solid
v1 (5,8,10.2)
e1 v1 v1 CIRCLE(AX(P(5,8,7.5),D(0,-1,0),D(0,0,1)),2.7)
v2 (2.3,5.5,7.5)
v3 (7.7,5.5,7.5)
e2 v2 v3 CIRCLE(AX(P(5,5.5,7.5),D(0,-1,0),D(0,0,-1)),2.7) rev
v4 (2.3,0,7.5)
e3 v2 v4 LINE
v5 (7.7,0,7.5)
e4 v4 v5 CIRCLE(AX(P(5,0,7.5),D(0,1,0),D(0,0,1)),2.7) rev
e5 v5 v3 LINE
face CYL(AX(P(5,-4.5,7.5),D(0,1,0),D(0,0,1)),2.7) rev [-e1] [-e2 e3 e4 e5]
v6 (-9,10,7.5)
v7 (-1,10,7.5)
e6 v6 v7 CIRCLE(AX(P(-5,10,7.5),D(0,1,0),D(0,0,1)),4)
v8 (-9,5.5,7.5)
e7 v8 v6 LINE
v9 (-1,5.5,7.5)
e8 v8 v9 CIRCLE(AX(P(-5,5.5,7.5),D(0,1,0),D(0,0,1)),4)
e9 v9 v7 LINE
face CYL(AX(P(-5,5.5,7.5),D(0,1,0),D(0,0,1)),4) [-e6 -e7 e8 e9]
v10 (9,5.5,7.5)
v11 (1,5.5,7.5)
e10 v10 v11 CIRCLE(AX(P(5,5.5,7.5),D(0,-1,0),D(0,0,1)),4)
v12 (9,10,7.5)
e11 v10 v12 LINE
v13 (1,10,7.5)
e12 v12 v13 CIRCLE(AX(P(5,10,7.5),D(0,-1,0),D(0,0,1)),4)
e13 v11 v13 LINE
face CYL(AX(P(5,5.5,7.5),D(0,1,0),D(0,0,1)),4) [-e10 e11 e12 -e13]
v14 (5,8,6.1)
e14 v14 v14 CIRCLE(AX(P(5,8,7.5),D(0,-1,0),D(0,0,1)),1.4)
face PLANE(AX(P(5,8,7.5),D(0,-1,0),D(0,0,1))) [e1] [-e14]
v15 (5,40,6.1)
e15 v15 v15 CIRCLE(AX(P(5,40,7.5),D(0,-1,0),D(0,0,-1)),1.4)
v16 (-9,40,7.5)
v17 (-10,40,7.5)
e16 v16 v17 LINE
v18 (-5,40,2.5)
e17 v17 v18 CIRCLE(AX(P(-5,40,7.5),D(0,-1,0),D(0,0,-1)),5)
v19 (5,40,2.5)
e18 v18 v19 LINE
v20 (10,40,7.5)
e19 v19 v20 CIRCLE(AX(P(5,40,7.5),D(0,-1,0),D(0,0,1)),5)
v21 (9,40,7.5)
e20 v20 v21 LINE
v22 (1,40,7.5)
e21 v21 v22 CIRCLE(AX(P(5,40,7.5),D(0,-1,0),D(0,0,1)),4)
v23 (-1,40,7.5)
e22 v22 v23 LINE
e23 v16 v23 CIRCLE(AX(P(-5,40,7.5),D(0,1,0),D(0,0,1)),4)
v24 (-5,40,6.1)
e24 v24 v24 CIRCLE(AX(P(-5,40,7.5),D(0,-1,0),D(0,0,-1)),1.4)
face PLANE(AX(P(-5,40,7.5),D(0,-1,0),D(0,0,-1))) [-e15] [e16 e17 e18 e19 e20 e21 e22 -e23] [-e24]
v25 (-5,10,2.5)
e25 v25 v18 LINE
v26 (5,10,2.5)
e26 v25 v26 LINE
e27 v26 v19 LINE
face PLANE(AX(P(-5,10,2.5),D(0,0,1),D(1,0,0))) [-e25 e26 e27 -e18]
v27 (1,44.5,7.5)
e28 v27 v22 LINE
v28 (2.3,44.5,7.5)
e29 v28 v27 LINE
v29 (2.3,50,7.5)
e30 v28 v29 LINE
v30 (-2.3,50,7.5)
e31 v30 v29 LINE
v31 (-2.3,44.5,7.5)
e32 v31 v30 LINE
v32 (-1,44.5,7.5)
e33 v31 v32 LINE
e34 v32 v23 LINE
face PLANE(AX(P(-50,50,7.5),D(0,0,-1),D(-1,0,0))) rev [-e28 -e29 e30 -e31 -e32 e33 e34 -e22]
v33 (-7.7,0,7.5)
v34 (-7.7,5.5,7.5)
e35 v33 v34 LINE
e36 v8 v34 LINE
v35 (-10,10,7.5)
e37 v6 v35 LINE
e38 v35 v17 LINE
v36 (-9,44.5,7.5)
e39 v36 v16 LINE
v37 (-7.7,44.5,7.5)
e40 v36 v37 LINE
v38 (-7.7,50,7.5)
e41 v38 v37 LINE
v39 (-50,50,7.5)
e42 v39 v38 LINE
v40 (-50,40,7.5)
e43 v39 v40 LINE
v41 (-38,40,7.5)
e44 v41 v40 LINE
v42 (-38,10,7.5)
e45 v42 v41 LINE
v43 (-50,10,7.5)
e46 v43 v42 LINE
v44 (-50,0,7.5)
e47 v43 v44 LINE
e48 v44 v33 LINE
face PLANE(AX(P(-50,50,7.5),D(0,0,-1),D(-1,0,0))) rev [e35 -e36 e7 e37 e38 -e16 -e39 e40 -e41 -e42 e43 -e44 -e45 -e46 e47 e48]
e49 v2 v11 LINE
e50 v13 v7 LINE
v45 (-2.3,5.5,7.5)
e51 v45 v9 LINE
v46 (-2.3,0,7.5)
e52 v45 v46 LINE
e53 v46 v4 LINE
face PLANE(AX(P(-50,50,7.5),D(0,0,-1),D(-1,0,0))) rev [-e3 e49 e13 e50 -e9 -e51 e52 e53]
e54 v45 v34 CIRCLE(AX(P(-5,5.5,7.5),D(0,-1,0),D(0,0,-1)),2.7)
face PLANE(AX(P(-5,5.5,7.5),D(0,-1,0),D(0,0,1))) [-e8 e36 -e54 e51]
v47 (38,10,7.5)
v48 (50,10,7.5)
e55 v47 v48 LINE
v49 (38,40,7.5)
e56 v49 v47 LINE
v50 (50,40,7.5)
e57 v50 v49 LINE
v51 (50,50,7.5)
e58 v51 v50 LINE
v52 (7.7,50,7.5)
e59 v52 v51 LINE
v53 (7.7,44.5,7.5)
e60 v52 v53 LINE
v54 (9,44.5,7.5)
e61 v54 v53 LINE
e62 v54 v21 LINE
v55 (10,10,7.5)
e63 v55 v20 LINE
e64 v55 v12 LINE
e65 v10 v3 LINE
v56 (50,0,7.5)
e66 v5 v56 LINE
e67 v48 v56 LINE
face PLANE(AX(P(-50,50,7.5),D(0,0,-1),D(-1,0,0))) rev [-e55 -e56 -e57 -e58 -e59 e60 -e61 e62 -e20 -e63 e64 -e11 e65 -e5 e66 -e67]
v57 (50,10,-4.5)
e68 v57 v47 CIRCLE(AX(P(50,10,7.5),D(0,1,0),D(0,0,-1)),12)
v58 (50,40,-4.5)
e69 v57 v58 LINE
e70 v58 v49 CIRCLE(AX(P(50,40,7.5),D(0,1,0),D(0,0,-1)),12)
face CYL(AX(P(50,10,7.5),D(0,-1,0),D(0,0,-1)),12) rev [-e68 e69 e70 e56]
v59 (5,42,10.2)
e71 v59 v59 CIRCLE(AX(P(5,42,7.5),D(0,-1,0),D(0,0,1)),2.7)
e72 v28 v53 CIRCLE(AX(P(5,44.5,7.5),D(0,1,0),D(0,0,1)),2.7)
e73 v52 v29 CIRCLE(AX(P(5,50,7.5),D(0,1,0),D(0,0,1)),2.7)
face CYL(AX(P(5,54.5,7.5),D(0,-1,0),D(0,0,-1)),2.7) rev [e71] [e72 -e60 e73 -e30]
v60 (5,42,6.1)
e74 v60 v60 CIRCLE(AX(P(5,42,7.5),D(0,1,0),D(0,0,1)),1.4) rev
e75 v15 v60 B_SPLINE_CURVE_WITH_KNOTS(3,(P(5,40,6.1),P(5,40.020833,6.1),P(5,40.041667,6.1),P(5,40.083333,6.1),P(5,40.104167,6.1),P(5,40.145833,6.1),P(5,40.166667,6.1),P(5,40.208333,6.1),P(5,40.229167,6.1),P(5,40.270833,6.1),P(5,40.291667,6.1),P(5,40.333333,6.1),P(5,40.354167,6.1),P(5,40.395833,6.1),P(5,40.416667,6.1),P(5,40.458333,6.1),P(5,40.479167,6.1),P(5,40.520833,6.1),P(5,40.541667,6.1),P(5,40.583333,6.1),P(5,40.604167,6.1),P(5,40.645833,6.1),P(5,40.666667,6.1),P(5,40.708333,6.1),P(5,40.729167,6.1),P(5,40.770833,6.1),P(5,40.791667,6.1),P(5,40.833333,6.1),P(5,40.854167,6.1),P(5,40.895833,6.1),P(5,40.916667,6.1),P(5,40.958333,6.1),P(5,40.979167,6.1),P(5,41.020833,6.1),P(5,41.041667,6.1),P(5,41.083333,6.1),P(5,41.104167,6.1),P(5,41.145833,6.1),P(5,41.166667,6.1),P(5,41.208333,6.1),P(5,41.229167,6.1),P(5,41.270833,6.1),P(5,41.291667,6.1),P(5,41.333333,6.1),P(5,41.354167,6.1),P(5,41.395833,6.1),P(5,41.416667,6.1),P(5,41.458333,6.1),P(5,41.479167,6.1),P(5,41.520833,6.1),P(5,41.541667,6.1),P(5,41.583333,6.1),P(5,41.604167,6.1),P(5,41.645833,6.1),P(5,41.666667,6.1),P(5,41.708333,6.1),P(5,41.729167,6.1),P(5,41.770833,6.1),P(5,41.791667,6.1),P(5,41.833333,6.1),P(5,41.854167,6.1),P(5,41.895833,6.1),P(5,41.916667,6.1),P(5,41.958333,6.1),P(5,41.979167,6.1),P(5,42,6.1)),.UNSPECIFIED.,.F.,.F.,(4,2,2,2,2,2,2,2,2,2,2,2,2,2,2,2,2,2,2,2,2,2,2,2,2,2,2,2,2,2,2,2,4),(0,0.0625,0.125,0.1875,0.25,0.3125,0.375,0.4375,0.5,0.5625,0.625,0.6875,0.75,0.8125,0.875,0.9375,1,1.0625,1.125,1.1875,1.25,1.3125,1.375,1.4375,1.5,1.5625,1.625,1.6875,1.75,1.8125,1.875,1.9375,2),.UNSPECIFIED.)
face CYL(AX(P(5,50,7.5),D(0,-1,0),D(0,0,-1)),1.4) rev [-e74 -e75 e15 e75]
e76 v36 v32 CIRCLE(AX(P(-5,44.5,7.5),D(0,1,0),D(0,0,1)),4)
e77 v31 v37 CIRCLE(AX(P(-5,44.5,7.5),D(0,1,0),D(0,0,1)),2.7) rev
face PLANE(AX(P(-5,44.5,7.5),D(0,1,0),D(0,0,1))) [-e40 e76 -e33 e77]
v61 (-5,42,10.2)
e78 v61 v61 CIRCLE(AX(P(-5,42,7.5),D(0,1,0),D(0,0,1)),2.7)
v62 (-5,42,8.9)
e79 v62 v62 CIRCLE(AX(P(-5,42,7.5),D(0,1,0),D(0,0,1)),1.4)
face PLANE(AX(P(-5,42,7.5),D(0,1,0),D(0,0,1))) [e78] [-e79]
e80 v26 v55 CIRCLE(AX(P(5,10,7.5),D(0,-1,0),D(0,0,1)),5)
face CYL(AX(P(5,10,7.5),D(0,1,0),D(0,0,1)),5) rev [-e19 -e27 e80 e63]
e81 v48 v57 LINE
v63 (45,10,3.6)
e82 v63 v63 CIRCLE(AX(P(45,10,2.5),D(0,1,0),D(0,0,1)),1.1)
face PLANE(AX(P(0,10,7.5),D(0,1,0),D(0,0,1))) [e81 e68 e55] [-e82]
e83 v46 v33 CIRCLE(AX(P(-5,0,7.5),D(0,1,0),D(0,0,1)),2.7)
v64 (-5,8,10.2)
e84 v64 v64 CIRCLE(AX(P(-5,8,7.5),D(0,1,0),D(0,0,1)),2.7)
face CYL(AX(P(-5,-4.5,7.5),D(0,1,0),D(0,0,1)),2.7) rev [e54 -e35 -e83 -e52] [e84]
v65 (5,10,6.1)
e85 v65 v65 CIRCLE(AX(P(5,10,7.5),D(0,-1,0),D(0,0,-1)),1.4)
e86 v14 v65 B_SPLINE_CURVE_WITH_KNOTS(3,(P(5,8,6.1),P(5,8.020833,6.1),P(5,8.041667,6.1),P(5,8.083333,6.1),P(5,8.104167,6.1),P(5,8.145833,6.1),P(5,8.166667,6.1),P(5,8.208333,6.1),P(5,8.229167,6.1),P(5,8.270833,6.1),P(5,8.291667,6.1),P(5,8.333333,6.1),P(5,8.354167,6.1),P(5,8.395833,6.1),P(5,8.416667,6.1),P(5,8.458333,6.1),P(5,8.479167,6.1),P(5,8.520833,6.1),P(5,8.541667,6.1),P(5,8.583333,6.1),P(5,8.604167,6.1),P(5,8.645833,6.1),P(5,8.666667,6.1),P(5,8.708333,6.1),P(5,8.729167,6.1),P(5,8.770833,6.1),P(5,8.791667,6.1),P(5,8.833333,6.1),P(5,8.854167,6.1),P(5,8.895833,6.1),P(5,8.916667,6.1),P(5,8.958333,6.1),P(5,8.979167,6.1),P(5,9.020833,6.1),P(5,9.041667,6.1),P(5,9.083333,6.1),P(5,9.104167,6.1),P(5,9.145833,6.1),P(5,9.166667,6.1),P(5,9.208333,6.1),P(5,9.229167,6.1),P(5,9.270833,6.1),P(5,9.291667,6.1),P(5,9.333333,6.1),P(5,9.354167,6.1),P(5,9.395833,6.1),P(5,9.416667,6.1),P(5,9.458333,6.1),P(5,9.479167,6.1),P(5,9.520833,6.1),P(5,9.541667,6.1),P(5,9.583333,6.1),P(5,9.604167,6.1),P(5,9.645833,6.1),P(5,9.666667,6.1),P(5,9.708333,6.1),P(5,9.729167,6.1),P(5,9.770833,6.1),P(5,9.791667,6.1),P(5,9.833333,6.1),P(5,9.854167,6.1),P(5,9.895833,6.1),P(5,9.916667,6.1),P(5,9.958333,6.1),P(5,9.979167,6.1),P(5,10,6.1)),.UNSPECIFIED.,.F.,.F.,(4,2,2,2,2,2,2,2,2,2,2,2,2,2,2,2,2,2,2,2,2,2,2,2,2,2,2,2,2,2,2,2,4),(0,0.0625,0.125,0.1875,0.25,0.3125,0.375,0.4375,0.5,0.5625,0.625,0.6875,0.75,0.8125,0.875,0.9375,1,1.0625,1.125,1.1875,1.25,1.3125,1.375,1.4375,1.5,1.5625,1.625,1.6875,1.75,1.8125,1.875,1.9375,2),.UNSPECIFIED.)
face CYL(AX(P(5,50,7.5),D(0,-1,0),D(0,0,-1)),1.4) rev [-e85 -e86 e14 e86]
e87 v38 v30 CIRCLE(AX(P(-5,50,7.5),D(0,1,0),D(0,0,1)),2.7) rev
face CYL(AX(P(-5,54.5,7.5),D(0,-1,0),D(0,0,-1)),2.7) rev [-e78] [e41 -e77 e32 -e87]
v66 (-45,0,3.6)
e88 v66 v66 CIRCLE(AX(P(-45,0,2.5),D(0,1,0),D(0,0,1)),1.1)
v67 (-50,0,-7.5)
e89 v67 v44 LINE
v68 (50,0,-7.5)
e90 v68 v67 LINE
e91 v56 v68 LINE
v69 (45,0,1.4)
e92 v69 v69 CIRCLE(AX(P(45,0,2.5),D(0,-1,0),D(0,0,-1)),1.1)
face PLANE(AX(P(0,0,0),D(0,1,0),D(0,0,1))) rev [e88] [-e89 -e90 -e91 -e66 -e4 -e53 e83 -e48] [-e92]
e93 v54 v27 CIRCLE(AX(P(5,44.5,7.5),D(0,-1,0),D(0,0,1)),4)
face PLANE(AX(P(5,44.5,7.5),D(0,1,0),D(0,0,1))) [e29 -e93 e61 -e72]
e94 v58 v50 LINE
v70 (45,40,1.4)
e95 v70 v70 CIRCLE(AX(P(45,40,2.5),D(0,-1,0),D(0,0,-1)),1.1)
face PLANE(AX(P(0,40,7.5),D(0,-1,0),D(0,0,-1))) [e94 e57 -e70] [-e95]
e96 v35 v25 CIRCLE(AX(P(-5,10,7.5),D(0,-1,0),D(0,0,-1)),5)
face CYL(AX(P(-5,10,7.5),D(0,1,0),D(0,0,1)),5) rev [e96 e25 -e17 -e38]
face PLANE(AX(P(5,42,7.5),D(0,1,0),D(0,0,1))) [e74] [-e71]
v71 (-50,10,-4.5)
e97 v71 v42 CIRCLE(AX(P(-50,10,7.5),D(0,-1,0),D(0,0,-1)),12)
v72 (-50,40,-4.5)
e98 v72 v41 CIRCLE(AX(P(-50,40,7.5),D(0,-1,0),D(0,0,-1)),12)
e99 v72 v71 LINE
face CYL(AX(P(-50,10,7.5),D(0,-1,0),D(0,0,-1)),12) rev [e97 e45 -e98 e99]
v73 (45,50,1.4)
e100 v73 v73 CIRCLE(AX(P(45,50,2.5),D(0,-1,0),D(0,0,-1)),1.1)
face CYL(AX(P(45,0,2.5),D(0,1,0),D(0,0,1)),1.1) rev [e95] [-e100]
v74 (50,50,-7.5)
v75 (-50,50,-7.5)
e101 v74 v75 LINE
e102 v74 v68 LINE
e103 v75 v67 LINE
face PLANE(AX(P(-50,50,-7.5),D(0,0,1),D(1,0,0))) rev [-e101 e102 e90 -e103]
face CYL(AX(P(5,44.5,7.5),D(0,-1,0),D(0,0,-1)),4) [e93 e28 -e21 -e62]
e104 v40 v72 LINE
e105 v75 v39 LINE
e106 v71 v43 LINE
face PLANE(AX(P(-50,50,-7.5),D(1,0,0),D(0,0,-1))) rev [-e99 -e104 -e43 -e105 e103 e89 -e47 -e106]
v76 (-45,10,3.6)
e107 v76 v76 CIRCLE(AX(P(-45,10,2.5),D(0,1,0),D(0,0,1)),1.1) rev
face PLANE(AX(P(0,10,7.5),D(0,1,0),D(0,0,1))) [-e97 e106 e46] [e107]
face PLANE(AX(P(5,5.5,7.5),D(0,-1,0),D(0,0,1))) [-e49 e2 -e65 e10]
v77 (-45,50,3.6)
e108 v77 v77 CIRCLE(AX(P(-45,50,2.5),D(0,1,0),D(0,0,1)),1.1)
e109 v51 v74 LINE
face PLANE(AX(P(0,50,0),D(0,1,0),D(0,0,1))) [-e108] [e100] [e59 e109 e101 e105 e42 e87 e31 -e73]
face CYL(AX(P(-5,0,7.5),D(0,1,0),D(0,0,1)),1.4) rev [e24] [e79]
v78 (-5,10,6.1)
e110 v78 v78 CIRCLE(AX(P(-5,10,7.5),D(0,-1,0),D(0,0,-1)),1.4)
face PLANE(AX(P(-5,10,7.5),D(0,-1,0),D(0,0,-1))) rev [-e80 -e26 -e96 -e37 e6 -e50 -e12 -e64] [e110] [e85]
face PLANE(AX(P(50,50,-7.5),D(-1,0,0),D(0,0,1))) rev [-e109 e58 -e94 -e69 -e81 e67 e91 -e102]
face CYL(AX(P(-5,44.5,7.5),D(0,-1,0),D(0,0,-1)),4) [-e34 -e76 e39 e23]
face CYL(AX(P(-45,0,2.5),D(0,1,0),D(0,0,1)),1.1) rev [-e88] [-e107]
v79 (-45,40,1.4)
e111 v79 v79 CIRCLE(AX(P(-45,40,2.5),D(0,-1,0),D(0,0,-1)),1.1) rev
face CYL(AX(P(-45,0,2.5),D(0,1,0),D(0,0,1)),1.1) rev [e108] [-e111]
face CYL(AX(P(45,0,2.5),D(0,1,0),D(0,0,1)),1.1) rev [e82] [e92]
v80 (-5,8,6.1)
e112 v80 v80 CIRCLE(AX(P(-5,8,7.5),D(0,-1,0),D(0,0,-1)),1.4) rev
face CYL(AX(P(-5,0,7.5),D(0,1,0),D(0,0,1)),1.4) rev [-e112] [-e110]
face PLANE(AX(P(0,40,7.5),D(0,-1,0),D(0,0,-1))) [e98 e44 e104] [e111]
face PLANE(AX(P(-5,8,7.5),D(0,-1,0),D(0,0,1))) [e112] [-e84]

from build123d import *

# Parameters (mm, degrees)
SKETCH_1_W               = 100
SKETCH_1_H               = 15
EXTRUDE_1_DEPTH          = 50
SKETCH_2_R               = 1.1
CUT_EXTRUDE_1_DEPTH      = 72.107313267
SKETCH_3_W               = 12
SKETCH_3_H               = 30
CUT_EXTRUDE_5_DEPTH      = 15
CUT_EXTRUDE_5_DEPTH_BACK = 15
EXTRUDE_2_DEPTH          = 4.5
CUT_EXTRUDE_START        = -2.5
SKETCH_5_R               = 2.7
CUT_EXTRUDE_2_DEPTH      = 12.5
SKETCH_6_R               = 1.4
CUT_EXTRUDE_4_DEPTH      = 67.304223093
MIRROR_4_COPY_1_DEPTH    = 4.5
MIRROR_START             = -2.5
MIRROR_4_COPY_2_SKETCH_R = 2.7
MIRROR_4_COPY_2_DEPTH    = 12.5
MIRROR_4_COPY_3_SKETCH_R = 1.4
MIRROR_4_COPY_3_DEPTH    = 67.304223093
MIRROR_4_COPY_4_DEPTH    = 4.5
MIRROR_4_COPY_5_SKETCH_R = 2.7
MIRROR_4_COPY_5_DEPTH    = 12.5
MIRROR_4_COPY_6_SKETCH_R = 1.4
MIRROR_4_COPY_6_DEPTH    = 67.304223093


with BuildPart() as part:
    # 草图1 → 凸台-拉伸1 (new body)
    with BuildSketch(Plane(origin=(0, 0, 0), x_dir=(1, 0, 0), z_dir=(0, 1, 0))):
        Rectangle(SKETCH_1_W, SKETCH_1_H)
    extrude(amount=EXTRUDE_1_DEPTH)

    # 草图2 → 切除-拉伸1 (cut, through all)
    with BuildSketch(Plane(origin=(0, 50, 0), x_dir=(1, 0, 0), z_dir=(0, 1, 0))):
        with Locations((-45, -2.5)):
            Circle(SKETCH_2_R)
        with Locations((45, -2.5)):
            Circle(SKETCH_2_R)
    extrude(amount=-CUT_EXTRUDE_1_DEPTH, mode=Mode.SUBTRACT)

    # 草图3 → 切除-旋转1 (revolve, cut)
    with BuildSketch(Plane.XY.offset(7.5)):
        with Locations((-44, 25)):
            Rectangle(SKETCH_3_W, SKETCH_3_H)
    cut_revolve_1 = revolve(axis=Axis((-50, 10, 7.5), (0, 1, 0)), mode=Mode.SUBTRACT)

    # 镜向1: 切除-旋转1 across plane
    add(cut_revolve_1.mirror(Plane.ZY), mode=Mode.SUBTRACT)

    # 草图10 → 切除-拉伸5 (cut, two sides: drawn at the far end of the back side and taken through both)
    with BuildSketch(Plane.XZ.offset(-25).offset(-CUT_EXTRUDE_5_DEPTH_BACK)):
        with BuildLine():
            Line((-5, 2.5), (5, 2.5))
            ThreePointArc((5, 2.5), (8.535533906, 3.964466094), (10, 7.5))
            Line((10, 7.5), (-10, 7.5))
            ThreePointArc((-10, 7.5), (-8.535533906, 3.964466094), (-5, 2.5))
        make_face()
    extrude(amount=CUT_EXTRUDE_5_DEPTH + CUT_EXTRUDE_5_DEPTH_BACK, mode=Mode.SUBTRACT)

    # 草图7 → 凸台-拉伸2 (add)
    with BuildSketch(Plane(origin=(0, 40, 0), x_dir=(1, 0, 0), z_dir=(0, 1, 0))):
        with BuildLine():
            Line((-9, -7.5), (-1, -7.5))
            ThreePointArc((-1, -7.5), (-5, -11.5), (-9, -7.5))
        make_face()
    extrude_2 = extrude(amount=EXTRUDE_2_DEPTH)

    # 草图5 → 切除-拉伸2 (cut)
    with BuildSketch(Plane(origin=(0, 44.5, 0), x_dir=(1, 0, 0), z_dir=(0, 1, 0)).offset(CUT_EXTRUDE_START)):
        with Locations((-5, -7.5)):
            Circle(SKETCH_5_R)
    cut_extrude_2 = extrude(amount=CUT_EXTRUDE_2_DEPTH, mode=Mode.SUBTRACT)

    # 草图6 → 切除-拉伸4 (cut, through all)
    with BuildSketch(Plane(origin=(0, 42, 0), x_dir=(1, 0, 0), z_dir=(0, 1, 0))):
        with Locations((-5, -7.5)):
            Circle(SKETCH_6_R)
    cut_extrude_4 = extrude(amount=-CUT_EXTRUDE_4_DEPTH, mode=Mode.SUBTRACT)

    # 镜向2: 凸台-拉伸2, 切除-拉伸2, 切除-拉伸4 across plane
    add(extrude_2.mirror(Plane(origin=(0, 25, 0), x_dir=(0, 0, 1), z_dir=(0, -1, 0))))
    add(cut_extrude_2.mirror(Plane(origin=(0, 25, 0), x_dir=(0, 0, 1), z_dir=(0, -1, 0))), mode=Mode.SUBTRACT)
    add(cut_extrude_4.mirror(Plane(origin=(0, 25, 0), x_dir=(0, 0, 1), z_dir=(0, -1, 0))), mode=Mode.SUBTRACT)

    # 镜向4 copy 1 sketch → 镜向4 copy 1 (add)
    with BuildSketch(Plane(origin=(0, 10, 0), x_dir=(-1, 0, 0), z_dir=(0, -1, 0))):
        with BuildLine():
            Line((-9, -7.5), (-1, -7.5))
            ThreePointArc((-1, -7.5), (-5, -11.5), (-9, -7.5))
        make_face()
    extrude(amount=MIRROR_4_COPY_1_DEPTH)

    # 镜向4 copy 2 sketch → 镜向4 copy 2 (cut)
    with BuildSketch(Plane(origin=(0, 5.5, 0), x_dir=(-1, 0, 0), z_dir=(0, -1, 0)).offset(MIRROR_START)):
        with Locations((-5, -7.5)):
            Circle(MIRROR_4_COPY_2_SKETCH_R)
    extrude(amount=MIRROR_4_COPY_2_DEPTH, mode=Mode.SUBTRACT)

    # 镜向4 copy 3 sketch → 镜向4 copy 3 (cut, through all)
    with BuildSketch(Plane(origin=(0, 8, 0), x_dir=(-1, 0, 0), z_dir=(0, -1, 0))):
        with Locations((-5, -7.5)):
            Circle(MIRROR_4_COPY_3_SKETCH_R)
    extrude(amount=-MIRROR_4_COPY_3_DEPTH, mode=Mode.SUBTRACT)

    # 镜向4 copy 4 sketch → 镜向4 copy 4 (add)
    with BuildSketch(Plane(origin=(0, 40, 0), x_dir=(-1, 0, 0), z_dir=(0, 1, 0))):
        with BuildLine():
            Line((-9, 7.5), (-1, 7.5))
            ThreePointArc((-1, 7.5), (-5, 11.5), (-9, 7.5))
        make_face()
    extrude(amount=MIRROR_4_COPY_4_DEPTH)

    # 镜向4 copy 5 sketch → 镜向4 copy 5 (cut)
    with BuildSketch(Plane(origin=(0, 44.5, 0), x_dir=(-1, 0, 0), z_dir=(0, 1, 0)).offset(MIRROR_START)):
        with Locations((-5, 7.5)):
            Circle(MIRROR_4_COPY_5_SKETCH_R)
    extrude(amount=MIRROR_4_COPY_5_DEPTH, mode=Mode.SUBTRACT)

    # 镜向4 copy 6 sketch → 镜向4 copy 6 (cut, through all)
    with BuildSketch(Plane(origin=(0, 42, 0), x_dir=(-1, 0, 0), z_dir=(0, 1, 0))):
        with Locations((-5, 7.5)):
            Circle(MIRROR_4_COPY_6_SKETCH_R)
    extrude(amount=-MIRROR_4_COPY_6_DEPTH, mode=Mode.SUBTRACT)


solid = part.part
